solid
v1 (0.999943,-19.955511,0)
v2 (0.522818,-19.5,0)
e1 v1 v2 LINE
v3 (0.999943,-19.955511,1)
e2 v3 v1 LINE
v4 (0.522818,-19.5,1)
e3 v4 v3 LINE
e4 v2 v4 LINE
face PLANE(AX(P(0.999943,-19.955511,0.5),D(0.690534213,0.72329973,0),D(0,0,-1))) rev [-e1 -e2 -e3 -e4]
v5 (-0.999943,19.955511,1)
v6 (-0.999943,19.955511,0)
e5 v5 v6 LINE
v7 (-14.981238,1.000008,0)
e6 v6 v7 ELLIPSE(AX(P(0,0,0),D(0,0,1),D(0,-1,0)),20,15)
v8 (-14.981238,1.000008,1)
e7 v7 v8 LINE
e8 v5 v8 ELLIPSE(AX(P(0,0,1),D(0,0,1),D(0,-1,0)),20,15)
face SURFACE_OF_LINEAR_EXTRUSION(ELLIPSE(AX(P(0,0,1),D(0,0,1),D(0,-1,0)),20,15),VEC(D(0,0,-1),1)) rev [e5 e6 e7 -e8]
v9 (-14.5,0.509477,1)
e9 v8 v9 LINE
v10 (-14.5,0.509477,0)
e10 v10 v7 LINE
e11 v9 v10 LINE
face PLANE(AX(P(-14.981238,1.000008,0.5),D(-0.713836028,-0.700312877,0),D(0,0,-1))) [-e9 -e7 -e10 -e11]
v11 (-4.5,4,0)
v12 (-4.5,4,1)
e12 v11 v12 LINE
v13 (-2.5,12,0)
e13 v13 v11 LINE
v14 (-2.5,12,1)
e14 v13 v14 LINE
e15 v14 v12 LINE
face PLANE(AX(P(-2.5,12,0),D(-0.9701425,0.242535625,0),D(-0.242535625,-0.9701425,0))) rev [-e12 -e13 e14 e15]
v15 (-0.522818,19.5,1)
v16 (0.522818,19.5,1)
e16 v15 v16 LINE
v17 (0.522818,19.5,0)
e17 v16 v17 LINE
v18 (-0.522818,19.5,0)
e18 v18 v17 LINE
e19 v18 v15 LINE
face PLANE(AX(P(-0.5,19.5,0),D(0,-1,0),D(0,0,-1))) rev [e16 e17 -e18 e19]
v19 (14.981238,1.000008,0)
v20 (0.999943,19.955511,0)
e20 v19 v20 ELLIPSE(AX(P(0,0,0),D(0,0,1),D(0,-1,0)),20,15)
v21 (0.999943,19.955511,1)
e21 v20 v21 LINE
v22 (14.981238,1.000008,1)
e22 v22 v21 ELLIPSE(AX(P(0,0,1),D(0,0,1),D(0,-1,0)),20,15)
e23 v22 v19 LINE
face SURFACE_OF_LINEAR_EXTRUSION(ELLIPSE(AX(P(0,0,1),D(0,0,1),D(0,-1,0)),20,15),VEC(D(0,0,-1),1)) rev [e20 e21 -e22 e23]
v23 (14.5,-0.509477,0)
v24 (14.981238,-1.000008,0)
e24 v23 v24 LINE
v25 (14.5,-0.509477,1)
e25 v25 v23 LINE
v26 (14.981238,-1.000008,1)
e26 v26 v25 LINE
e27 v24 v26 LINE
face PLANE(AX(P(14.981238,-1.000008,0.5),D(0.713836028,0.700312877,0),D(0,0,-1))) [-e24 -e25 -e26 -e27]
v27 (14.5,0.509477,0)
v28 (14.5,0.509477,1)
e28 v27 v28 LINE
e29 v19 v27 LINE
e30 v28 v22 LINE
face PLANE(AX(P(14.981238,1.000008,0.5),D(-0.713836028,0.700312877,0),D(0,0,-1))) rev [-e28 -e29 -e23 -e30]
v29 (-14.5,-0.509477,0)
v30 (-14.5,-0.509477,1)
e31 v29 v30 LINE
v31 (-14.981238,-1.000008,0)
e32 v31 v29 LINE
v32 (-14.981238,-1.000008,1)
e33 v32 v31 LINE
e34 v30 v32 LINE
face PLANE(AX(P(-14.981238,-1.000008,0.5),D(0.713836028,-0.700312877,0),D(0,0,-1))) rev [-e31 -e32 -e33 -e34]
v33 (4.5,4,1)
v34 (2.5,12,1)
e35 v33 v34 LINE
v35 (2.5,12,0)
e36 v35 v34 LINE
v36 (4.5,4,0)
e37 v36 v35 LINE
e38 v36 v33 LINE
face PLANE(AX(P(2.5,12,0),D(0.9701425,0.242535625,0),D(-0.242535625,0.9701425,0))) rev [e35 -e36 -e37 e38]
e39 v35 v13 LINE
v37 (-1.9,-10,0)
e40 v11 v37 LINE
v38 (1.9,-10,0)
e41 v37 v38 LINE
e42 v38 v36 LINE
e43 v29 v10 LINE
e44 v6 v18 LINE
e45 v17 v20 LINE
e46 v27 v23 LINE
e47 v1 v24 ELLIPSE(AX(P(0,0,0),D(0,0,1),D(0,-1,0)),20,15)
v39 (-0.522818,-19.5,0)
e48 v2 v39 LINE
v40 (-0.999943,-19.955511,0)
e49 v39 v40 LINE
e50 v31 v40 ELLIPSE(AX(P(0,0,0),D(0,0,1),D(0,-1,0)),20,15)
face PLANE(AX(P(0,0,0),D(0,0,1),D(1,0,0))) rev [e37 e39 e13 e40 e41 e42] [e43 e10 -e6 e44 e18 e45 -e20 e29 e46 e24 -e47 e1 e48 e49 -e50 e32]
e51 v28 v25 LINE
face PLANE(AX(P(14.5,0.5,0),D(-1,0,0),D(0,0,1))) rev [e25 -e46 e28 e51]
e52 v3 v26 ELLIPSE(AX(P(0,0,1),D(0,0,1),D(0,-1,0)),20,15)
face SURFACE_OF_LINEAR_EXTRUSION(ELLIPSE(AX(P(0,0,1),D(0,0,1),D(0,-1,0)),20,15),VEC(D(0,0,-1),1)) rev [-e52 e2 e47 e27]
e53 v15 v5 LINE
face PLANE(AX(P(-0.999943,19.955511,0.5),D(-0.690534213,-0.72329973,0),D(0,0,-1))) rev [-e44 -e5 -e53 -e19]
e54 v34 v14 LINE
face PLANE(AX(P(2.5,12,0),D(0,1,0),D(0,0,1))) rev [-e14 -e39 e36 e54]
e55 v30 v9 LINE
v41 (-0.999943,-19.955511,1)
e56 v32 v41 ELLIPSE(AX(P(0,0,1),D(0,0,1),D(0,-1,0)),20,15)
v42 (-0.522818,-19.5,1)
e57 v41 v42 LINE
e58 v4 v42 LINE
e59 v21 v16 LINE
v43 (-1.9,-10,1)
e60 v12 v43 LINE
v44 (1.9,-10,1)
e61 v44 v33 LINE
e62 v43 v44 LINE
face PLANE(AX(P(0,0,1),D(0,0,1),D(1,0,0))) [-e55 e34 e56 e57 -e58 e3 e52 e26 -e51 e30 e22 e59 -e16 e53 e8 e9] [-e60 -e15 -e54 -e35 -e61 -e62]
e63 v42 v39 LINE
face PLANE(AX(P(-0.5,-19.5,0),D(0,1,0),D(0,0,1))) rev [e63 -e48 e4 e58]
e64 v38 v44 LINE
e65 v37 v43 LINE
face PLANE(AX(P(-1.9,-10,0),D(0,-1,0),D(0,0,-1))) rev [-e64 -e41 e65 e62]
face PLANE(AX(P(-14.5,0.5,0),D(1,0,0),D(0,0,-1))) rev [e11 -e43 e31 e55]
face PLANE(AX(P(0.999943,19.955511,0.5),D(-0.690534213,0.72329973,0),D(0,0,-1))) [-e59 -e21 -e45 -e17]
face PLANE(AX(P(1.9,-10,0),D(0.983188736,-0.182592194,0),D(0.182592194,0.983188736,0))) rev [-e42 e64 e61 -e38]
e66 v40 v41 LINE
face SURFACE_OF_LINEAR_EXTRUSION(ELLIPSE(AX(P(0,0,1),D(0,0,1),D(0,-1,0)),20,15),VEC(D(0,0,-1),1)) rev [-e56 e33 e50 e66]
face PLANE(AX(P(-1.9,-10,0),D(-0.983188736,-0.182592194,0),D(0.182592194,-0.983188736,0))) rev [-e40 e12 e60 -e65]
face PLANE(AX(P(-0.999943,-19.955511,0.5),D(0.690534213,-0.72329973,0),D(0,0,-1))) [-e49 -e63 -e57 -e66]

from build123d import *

# Parameters (mm, degrees)
SKETCH_1_RX         = 20
SKETCH_1_RY         = 15
EXTRUDE_1_DEPTH     = 1
CUT_EXTRUDE_1_DEPTH = 1
SKETCH_3_W          = 1
SKETCH_3_H          = 1
CUT_EXTRUDE_2_DEPTH = 1
CHAMFER_START       = -1
CHAMFER_1_DEPTH     = 3


with BuildPart() as part:
    # 스케치1 → 보스-돌출1 (new body)
    with BuildSketch(Plane.XY):
        with Locations(Location((0, 0), (0, 0, -90))):
            Ellipse(SKETCH_1_RX, SKETCH_1_RY)
    extrude(amount=EXTRUDE_1_DEPTH)

    # 스케치2 → 컷-돌출1 (cut)
    with BuildSketch(Plane.XY.offset(1)):
        Polygon((2.5, 12), (-2.5, 12), (-4.5, 4), (-1.9, -10), (1.9, -10), (4.5, 4), align=None)
    extrude(amount=-CUT_EXTRUDE_1_DEPTH, mode=Mode.SUBTRACT)

    # 스케치3 → 컷-돌출2 (cut)
    with BuildSketch(Plane.XY.offset(1)):
        with Locations((0, 20)):
            Rectangle(SKETCH_3_W, SKETCH_3_H)
        with Locations((15, 0)):
            Rectangle(SKETCH_3_W, SKETCH_3_H)
        with Locations((-15, 0)):
            Rectangle(SKETCH_3_W, SKETCH_3_H)
        with Locations((0, -20)):
            Rectangle(SKETCH_3_W, SKETCH_3_H)
    extrude(amount=-CUT_EXTRUDE_2_DEPTH, mode=Mode.SUBTRACT)

    # 모따기1: read off the stored shape, not the designer's step
    # 모따기1 outline → 모따기1 (cut)
    with BuildSketch(Plane.XY.offset(CHAMFER_START)):
        with BuildLine():
            Line((-14.5, 0.509476942), (-14.981237977, 1.0000077))
            add(Edge.make_bspline(
                [(-14.981237977, 1.0000077), (-14.990620528, 0.750121225), (-14.995311767, 0.5)],
                knots=[4.659948749, 4.659948749, 4.659948749, 4.687386375, 4.687386375, 4.687386375], degree=2, weights=[0.990289953, 0.995055274, 1]))
            Line((-14.995311767, 0.5), (-14.5, 0.5))
            Line((-14.5, 0.5), (-14.5, 0.509476942))
        make_face()
        with BuildLine():
            add(Edge.make_bspline(
                [(-0.5, 19.988885801), (-0.750180122, 19.977760502), (-0.999942528, 19.955511183)],
                knots=[3.174932163, 3.174932163, 3.174932163, 3.211472839, 3.211472839, 3.211472839], degree=2, weights=[1, 0.99341475, 0.987147697]))
            Line((-0.999942528, 19.955511183), (-0.522817559, 19.5))
            Line((-0.522817559, 19.5), (-0.5, 19.5))
            Line((-0.5, 19.5), (-0.5, 19.988885801))
        make_face()
        with BuildLine():
            Line((-14.5, -0.509476942), (-14.5, -0.5))
            Line((-14.5, -0.5), (-14.995311767, -0.5))
            add(Edge.make_bspline(
                [(-14.995311767, -0.5), (-14.990620528, -0.750121225), (-14.981237977, -1.0000077)],
                knots=[4.737391585, 4.737391585, 4.737391585, 4.764829212, 4.764829212, 4.764829212], degree=2, weights=[1, 0.995055274, 0.990289953]))
            Line((-14.981237977, -1.0000077), (-14.5, -0.509476942))
        make_face()
        with BuildLine():
            Line((0.5, 19.988885801), (0.5, 19.5))
            Line((0.5, 19.5), (0.522817559, 19.5))
            Line((0.522817559, 19.5), (0.999942528, 19.955511183))
            add(Edge.make_bspline(
                [(0.999942528, 19.955511183), (0.750180122, 19.977760502), (0.5, 19.988885801)],
                knots=[3.071712468, 3.071712468, 3.071712468, 3.108253144, 3.108253144, 3.108253144], degree=2, weights=[0.987147697, 0.99341475, 1]))
        make_face()
        with BuildLine():
            Line((-0.522817559, -19.5), (-0.999942528, -19.955511183))
            add(Edge.make_bspline(
                [(-0.999942528, -19.955511183), (-0.750180122, -19.977760502), (-0.5, -19.988885801)],
                knots=[6.213305122, 6.213305122, 6.213305122, 6.249845798, 6.249845798, 6.249845798], degree=2, weights=[0.987147697, 0.99341475, 1]))
            Line((-0.5, -19.988885801), (-0.5, -19.5))
            Line((-0.5, -19.5), (-0.522817559, -19.5))
        make_face()
        with BuildLine():
            add(Edge.make_bspline(
                [(14.995311767, 0.5), (14.990620528, 0.750121225), (14.981237977, 1.0000077)],
                knots=[1.595798932, 1.595798932, 1.595798932, 1.623236559, 1.623236559, 1.623236559], degree=2, weights=[1, 0.995055274, 0.990289953]))
            Line((14.981237977, 1.0000077), (14.5, 0.509476942))
            Line((14.5, 0.509476942), (14.5, 0.5))
            Line((14.5, 0.5), (14.995311767, 0.5))
        make_face()
        with BuildLine():
            Line((0.522817559, -19.5), (0.5, -19.5))
            Line((0.5, -19.5), (0.5, -19.988885801))
            add(Edge.make_bspline(
                [(0.5, -19.988885801), (0.750180122, -19.977760502), (0.999942528, -19.955511183)],
                knots=[0.033339509, 0.033339509, 0.033339509, 0.069880186, 0.069880186, 0.069880186], degree=2, weights=[1, 0.99341475, 0.987147697]))
            Line((0.999942528, -19.955511183), (0.522817559, -19.5))
        make_face()
        with BuildLine():
            Line((14.995311767, -0.5), (14.5, -0.5))
            Line((14.5, -0.5), (14.5, -0.509476942))
            Line((14.5, -0.509476942), (14.981237977, -1.0000077))
            add(Edge.make_bspline(
                [(14.981237977, -1.0000077), (14.990620528, -0.750121225), (14.995311767, -0.5)],
                knots=[1.518356095, 1.518356095, 1.518356095, 1.545793722, 1.545793722, 1.545793722], degree=2, weights=[0.990289953, 0.995055274, 1]))
        make_face()
    extrude(amount=CHAMFER_1_DEPTH, mode=Mode.SUBTRACT)


solid = part.part
